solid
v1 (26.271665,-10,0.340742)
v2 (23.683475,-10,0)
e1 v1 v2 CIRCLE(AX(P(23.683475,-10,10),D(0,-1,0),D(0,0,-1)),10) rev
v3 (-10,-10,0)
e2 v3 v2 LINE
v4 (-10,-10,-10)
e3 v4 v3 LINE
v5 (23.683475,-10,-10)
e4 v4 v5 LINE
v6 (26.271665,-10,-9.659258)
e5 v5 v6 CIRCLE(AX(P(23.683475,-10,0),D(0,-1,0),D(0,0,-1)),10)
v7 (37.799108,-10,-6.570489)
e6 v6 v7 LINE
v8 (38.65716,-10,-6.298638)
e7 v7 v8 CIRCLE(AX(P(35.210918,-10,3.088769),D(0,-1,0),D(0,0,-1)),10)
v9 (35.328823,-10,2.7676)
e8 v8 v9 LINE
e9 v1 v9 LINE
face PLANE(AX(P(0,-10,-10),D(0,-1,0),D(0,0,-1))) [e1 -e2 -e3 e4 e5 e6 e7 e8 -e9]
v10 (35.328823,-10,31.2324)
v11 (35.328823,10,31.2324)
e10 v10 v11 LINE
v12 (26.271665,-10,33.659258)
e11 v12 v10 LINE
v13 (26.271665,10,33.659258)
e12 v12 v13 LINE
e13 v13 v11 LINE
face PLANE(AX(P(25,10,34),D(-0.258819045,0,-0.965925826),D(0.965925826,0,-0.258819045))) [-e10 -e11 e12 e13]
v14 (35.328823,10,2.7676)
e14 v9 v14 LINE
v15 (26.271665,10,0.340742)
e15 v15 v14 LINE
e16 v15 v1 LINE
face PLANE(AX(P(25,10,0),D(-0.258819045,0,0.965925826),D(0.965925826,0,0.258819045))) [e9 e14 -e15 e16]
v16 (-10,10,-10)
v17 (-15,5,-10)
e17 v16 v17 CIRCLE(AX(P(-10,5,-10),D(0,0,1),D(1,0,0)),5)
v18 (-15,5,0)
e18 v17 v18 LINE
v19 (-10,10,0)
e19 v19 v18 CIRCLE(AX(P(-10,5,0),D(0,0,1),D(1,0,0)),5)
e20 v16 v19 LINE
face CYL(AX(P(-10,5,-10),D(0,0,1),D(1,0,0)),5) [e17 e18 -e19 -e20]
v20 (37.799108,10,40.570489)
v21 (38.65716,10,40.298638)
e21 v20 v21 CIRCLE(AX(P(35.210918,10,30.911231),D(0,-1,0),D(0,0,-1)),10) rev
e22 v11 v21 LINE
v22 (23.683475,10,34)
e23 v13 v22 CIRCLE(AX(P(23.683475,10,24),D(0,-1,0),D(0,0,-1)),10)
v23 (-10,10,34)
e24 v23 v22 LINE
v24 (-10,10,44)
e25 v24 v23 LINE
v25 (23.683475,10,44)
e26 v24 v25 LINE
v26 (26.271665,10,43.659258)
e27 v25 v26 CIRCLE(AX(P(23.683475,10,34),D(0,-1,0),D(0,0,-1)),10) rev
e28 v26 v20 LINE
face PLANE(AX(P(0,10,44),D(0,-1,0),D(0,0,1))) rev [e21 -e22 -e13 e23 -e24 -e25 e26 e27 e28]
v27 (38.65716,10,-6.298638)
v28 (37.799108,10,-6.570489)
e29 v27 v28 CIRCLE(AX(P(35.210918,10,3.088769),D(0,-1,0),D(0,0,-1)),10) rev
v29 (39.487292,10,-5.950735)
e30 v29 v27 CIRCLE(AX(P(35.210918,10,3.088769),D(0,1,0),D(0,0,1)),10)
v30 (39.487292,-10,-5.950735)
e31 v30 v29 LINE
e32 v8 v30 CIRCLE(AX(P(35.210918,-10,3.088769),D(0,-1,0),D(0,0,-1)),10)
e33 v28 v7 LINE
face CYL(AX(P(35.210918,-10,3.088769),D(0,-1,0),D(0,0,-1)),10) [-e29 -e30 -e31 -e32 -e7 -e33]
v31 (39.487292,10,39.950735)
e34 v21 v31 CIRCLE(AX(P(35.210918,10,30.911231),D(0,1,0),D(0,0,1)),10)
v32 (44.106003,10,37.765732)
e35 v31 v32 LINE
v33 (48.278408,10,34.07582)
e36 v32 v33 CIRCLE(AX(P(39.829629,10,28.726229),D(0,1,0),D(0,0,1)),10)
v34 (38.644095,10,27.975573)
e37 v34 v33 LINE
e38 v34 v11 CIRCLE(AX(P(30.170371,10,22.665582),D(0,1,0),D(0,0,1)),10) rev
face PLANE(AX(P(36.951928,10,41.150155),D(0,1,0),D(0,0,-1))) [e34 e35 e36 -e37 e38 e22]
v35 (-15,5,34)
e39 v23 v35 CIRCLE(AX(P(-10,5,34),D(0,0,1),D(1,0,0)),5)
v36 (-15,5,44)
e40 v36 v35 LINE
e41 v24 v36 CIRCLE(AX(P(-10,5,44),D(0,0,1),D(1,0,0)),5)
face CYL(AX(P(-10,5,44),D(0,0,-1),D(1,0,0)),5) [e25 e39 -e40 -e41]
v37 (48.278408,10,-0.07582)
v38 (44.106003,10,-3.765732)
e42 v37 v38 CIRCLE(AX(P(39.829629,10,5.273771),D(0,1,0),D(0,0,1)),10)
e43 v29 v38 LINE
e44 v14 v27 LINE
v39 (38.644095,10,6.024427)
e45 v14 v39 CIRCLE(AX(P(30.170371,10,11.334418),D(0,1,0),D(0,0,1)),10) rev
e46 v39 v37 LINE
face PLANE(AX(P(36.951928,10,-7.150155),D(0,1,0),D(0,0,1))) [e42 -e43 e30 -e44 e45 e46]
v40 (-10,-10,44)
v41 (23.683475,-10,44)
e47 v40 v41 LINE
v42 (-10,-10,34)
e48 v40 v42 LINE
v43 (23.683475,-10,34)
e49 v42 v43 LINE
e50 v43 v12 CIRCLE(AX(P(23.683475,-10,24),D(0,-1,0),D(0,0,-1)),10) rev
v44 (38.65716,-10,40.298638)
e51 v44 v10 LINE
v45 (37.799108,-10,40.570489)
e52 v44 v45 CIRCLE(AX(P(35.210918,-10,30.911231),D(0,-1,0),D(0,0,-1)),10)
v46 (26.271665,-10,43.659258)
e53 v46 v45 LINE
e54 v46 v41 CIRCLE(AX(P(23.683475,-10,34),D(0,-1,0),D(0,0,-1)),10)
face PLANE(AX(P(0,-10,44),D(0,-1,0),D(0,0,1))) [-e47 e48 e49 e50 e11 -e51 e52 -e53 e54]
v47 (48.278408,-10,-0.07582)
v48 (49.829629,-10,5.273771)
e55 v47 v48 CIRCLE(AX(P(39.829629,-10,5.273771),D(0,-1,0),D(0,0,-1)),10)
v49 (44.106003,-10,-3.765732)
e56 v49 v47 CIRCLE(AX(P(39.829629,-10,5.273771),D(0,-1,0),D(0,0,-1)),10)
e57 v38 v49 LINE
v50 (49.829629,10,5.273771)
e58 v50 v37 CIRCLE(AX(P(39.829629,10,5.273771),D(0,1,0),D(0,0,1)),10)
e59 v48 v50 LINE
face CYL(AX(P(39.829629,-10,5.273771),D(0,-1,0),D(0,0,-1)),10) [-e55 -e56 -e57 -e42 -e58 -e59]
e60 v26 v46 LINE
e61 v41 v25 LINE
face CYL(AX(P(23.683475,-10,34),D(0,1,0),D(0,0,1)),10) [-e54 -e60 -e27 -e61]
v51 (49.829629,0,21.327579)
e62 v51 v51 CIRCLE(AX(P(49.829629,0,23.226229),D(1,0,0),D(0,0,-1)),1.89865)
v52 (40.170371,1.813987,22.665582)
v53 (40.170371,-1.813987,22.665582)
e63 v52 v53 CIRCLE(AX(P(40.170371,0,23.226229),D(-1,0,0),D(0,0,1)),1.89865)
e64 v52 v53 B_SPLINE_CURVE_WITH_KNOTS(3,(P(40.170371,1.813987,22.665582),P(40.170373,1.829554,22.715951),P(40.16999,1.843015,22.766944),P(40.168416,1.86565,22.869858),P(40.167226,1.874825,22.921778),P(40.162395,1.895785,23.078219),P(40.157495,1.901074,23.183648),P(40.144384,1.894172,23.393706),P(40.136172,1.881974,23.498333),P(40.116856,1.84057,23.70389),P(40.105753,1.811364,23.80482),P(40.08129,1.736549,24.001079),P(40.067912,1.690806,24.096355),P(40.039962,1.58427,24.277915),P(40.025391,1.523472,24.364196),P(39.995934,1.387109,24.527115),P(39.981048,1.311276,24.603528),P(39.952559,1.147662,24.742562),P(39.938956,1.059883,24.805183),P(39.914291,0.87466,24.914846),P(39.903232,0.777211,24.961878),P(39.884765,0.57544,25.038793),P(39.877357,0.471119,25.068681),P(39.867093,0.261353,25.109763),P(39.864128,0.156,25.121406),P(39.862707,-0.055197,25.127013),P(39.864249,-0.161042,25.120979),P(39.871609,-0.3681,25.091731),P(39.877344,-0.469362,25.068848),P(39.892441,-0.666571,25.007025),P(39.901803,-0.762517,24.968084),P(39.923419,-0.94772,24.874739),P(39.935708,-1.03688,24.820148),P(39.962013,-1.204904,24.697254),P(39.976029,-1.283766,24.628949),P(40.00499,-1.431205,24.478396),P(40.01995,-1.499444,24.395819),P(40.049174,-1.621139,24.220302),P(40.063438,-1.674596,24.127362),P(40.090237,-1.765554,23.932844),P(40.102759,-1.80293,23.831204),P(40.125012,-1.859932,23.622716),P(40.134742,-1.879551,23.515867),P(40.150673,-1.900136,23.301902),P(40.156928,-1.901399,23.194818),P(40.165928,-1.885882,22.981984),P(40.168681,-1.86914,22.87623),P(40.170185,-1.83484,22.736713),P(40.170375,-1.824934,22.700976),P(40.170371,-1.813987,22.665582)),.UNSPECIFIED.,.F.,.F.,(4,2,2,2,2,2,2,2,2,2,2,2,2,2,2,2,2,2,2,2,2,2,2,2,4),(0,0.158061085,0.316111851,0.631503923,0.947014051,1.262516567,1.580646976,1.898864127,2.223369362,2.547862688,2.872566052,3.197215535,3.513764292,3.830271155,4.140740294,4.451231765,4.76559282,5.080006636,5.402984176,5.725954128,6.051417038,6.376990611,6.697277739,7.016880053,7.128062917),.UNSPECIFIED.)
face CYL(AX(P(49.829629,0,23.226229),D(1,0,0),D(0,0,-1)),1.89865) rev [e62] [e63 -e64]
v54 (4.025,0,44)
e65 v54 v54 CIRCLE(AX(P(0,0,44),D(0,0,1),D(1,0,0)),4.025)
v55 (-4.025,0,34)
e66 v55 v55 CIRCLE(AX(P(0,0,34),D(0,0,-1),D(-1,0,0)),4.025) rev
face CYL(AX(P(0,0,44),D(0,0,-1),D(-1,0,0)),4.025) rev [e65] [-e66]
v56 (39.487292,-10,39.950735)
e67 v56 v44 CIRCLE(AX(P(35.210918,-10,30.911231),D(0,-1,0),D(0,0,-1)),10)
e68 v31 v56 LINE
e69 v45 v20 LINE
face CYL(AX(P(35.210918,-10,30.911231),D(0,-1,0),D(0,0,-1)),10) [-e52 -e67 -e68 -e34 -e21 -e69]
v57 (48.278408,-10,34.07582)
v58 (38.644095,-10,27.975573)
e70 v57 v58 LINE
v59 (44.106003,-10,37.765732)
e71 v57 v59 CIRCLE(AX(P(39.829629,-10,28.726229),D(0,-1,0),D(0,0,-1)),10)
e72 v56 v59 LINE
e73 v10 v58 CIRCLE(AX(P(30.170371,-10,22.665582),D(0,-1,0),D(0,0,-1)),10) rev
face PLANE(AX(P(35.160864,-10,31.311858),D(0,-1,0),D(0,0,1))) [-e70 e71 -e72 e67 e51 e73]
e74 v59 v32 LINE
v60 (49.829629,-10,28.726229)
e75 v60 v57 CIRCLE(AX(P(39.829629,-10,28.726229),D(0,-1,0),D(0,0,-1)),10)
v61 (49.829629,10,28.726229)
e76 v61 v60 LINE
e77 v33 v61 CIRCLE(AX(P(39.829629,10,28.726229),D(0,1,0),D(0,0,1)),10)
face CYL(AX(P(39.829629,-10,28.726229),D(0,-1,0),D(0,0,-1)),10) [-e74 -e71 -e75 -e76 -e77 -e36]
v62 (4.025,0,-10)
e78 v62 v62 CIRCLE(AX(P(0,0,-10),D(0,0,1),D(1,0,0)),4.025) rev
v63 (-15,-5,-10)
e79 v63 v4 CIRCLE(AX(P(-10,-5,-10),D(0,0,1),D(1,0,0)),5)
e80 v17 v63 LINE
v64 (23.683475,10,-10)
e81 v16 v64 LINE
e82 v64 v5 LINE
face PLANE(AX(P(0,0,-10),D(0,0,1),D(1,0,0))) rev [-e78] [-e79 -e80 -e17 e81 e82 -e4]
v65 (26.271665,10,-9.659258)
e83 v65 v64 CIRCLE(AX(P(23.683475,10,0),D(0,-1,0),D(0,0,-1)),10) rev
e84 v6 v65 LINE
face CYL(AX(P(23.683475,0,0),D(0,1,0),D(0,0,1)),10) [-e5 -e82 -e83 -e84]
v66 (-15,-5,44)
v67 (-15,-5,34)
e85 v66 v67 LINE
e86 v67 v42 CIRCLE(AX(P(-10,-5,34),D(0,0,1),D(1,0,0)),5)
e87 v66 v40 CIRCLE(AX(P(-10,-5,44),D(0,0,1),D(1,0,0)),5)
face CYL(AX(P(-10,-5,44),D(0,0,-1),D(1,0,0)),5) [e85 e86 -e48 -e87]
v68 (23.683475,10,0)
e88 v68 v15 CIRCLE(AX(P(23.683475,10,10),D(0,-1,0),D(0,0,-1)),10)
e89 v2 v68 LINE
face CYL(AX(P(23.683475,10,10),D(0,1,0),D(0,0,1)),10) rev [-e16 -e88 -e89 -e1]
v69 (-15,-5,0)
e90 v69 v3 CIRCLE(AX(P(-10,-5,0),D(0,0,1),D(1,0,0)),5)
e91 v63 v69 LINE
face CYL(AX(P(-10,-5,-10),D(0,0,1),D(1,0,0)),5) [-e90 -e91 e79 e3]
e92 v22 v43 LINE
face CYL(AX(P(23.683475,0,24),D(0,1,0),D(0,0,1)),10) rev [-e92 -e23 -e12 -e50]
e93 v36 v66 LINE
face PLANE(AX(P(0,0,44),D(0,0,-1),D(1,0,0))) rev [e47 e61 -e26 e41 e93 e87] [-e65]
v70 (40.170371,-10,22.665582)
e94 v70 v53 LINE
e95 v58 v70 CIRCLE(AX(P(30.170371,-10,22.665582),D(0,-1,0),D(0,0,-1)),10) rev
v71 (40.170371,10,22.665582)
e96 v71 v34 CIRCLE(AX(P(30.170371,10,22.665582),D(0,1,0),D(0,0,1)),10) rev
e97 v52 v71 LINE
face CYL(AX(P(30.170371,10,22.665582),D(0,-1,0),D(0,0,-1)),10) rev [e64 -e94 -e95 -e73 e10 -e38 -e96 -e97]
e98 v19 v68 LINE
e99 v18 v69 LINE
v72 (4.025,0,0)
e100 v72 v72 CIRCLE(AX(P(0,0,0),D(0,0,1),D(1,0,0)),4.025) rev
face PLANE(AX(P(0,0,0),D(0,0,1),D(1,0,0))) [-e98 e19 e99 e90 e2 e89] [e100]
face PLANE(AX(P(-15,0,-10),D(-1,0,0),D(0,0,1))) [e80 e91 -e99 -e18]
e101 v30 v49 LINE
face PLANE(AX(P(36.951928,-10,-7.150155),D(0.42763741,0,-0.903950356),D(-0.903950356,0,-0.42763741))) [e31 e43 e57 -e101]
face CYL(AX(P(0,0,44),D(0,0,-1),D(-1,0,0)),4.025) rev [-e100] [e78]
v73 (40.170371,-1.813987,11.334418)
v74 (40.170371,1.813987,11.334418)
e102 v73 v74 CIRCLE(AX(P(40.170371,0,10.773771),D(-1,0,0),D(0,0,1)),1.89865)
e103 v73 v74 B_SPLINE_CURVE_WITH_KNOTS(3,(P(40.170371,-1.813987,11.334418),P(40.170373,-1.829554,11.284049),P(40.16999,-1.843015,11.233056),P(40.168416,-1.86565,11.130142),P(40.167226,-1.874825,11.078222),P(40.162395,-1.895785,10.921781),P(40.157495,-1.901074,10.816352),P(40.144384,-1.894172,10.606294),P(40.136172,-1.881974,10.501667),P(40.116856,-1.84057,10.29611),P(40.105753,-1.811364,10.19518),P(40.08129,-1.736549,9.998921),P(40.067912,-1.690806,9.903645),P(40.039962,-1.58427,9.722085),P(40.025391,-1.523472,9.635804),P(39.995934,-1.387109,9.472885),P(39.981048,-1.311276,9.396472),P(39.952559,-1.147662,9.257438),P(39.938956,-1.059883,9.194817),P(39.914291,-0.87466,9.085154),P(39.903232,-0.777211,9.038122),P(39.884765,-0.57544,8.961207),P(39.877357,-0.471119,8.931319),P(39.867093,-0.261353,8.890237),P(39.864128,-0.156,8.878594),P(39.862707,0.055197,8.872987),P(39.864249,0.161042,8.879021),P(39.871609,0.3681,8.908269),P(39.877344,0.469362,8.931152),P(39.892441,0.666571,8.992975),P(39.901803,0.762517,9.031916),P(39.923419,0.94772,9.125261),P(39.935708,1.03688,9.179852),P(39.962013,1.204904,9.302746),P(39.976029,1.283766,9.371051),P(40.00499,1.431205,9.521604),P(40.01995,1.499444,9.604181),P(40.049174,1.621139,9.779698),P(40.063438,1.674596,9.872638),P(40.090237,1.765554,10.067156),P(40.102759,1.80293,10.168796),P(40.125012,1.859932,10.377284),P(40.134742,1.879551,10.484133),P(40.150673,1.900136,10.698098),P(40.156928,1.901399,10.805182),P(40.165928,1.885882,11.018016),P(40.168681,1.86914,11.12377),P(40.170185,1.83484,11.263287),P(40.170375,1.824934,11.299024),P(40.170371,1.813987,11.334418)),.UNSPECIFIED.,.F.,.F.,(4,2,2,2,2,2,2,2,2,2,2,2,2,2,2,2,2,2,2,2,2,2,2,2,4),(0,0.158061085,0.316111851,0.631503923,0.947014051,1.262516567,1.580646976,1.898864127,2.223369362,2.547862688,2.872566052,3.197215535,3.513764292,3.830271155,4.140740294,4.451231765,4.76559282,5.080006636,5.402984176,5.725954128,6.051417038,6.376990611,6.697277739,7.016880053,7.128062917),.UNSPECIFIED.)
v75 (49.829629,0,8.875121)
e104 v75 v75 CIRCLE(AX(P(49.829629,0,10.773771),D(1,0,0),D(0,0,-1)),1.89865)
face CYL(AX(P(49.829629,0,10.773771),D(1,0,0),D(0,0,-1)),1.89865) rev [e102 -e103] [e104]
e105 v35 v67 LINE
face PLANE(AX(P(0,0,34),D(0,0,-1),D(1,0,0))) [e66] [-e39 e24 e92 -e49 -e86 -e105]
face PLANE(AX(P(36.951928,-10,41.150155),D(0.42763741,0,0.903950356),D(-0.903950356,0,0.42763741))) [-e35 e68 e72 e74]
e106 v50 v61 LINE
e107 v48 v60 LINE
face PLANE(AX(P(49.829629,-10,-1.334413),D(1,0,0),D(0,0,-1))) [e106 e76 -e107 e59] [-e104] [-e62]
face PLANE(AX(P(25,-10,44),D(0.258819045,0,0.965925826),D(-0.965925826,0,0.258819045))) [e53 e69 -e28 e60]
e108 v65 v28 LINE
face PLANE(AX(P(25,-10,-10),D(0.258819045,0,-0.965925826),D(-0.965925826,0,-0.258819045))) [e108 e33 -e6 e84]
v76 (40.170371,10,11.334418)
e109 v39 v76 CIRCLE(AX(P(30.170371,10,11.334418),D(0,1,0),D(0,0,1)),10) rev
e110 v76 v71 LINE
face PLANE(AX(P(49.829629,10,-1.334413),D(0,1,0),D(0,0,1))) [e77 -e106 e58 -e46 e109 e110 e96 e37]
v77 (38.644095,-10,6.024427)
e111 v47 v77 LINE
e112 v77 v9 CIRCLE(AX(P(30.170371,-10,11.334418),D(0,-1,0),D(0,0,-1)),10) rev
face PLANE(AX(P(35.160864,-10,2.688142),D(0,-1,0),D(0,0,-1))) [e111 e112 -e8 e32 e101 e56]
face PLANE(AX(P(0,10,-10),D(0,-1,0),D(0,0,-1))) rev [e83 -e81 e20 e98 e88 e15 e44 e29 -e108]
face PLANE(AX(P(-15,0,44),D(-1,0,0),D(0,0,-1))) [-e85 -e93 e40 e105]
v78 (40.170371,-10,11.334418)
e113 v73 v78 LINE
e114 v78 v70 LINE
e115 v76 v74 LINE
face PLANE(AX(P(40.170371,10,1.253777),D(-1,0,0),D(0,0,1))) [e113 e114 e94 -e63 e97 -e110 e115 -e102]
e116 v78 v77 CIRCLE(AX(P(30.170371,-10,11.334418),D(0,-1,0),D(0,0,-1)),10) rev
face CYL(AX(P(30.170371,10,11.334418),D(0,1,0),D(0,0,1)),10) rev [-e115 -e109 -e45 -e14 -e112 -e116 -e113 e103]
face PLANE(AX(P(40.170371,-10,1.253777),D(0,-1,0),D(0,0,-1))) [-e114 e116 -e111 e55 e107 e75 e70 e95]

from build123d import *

# Parameters (mm, degrees)
SKETCH4_R                      = 4.025
BOSS_EXTRUDE1_DEPTH            = 10
SWEEP2_START                   = -10
SWEEP2_DEPTH                   = 20
CUT_EXTRUDE2_REACH             = 58.724
BOSS_EXTRUDE2_DEPTH            = 20
CUT_EXTRUDE3_REACH             = 69.223
SKETCH4_10_R                   = 4.025
CUT_EXTRUDE3_DIRECTION_2_DEPTH = 68.223447839
FILLET4_R                      = 10
F_6_CLEARANCE_HOLE1_D          = 3.7973


with BuildPart() as part:
    # Sketch4 → Boss-Extrude1 (new body)
    # profile 1 of 2: a face of its own
    with BuildSketch(Plane.XY):
        with BuildLine():
            Line((-10, 10), (25, 10))
            Line((25, 10), (25, -10))
            Line((25, -10), (-10, -10))
            ThreePointArc((-10, -10), (-13.535533906, -8.535533906), (-15, -5))
            Line((-15, -5), (-15, 5))
            ThreePointArc((-15, 5), (-13.535533906, 8.535533906), (-10, 10))
        make_face()
        Circle(SKETCH4_R, mode=Mode.SUBTRACT)
    # profile 2 of 2: a face of its own
    with BuildSketch(Plane.XY):
        Circle(SKETCH4_R)
    extrude(amount=-BOSS_EXTRUDE1_DEPTH)

    # Sweep2: read off the stored shape, not the designer's step
    # Sweep2 outline → Sweep2 (add)
    with BuildSketch(Plane(origin=(0, 0, 0), x_dir=(1, 0, 0), z_dir=(0, 1, 0)).offset(SWEEP2_START)):
        Polygon((40.170370869, -5.058020855), (40.170370869, -18.294095226), (49.829629131, -15.705904774), (49.829629131, 1.058020855), (38.67117676, 6.336819228), (25, 10), (25, 0), (35.32882324, -2.767599846), align=None)
    extrude(amount=SWEEP2_DEPTH)

    # Sketch18 → Cut-Extrude2 (cut, up to next)
    with BuildSketch(Plane(origin=(0, 10, 0), x_dir=(1, 0, 0), z_dir=(0, 1, 0)), mode=Mode.PRIVATE) as cut_extrude2_sk1:
        Polygon((40.170370869, -18.294095226), (45, -17), (40.170370869, -17), align=None)
    cut_extrude2_tool1 = extrude(cut_extrude2_sk1.sketch, amount=-CUT_EXTRUDE2_REACH, mode=Mode.PRIVATE) & part.part
    add(cut_extrude2_tool1.solids().sort_by_distance((41.780247, 10, 17.431365))[0], mode=Mode.SUBTRACT)

    # Sketch18<3> → Boss-Extrude2 (add, through all)
    with BuildSketch(Plane(origin=(0, 10, 0), x_dir=(1, 0, 0), z_dir=(0, 1, 0))):
        Polygon((49.829629131, -17), (49.829629131, -15.705904774), (45, -17), align=None)
    extrude(amount=-BOSS_EXTRUDE2_DEPTH)

    # Mirror1: part across face


with BuildPart() as part_1:
    add(part.part)
    add(part.part.mirror(Plane(origin=(45, 0, 17), x_dir=(1, 0, 0), z_dir=(0, 0, 1))))

    # Sketch4<10> → Cut-Extrude3 (cut, up to next)
    with BuildSketch(Plane.XY, mode=Mode.PRIVATE) as cut_extrude3_sk1:
        with Locations(Location((0, 0, 0), (0, 0, 180))):
            Circle(SKETCH4_10_R)
    cut_extrude3_tool1 = extrude(cut_extrude3_sk1.sketch, amount=-CUT_EXTRUDE3_REACH, mode=Mode.PRIVATE) & part_1.part
    add(cut_extrude3_tool1.solids().sort_by_distance((0, 0, 0))[0], mode=Mode.SUBTRACT)

    # Sketch4<10> → Cut-Extrude3 direction 2 (cut)
    with BuildSketch(Plane.XY):
        with Locations(Location((0, 0, 0), (0, 0, 180))):
            Circle(SKETCH4_10_R)
    extrude(amount=CUT_EXTRUDE3_DIRECTION_2_DEPTH, mode=Mode.SUBTRACT)

    # Fillet4
    # the kernel refuses this fillet: 10 mm, written as the material it adds along each edge
    with BuildSketch(Plane(origin=(25, 10, 34), x_dir=(-1, 0, 0), z_dir=(0, -1, 0))) as fillet4_piece_1:
        with BuildLine():
            CenterArc((FILLET4_R * 0.131652497591, FILLET4_R), FILLET4_R, 255, 15)
            Line((-FILLET4_R * 0.127166547518, FILLET4_R * 0.0340741737128), (0, 0))
            Line((0, 0), (FILLET4_R * 0.131652497591, 0))
        make_face()
    extrude(amount=20)
    with BuildSketch(Plane(origin=(25, 10, 0), x_dir=(-1, 0, 0), z_dir=(0, -1, 0))) as fillet4_piece_2:
        with BuildLine():
            CenterArc((FILLET4_R * 0.131652497591, -FILLET4_R), FILLET4_R, 90, 15)
            Line((-FILLET4_R * 0.127166547518, -FILLET4_R * 0.0340741737128), (0, 0))
            Line((0, 0), (FILLET4_R * 0.131652497591, 0))
        make_face()
    extrude(amount=20)
    with BuildSketch(Plane(origin=(40.170370869, -10, 5.058020855), x_dir=(0, 0, 1), z_dir=(0, 1, 0))) as fillet4_piece_3:
        with BuildLine():
            CenterArc((6.276396903, -10), FILLET4_R, 90, 58.94603144)
            Line((-2.290421009, -4.841547629), (0, 0))
            Line((0, 0), (6.276396903, 0))
        make_face()
    extrude(amount=20)
    with BuildSketch(Plane(origin=(40.170370869, -10, 28.941979145), x_dir=(-0.90395035591234, 0, 0.4276374095492042), z_dir=(0, 1, 0))) as fillet4_piece_4:
        with BuildLine():
            CenterArc((6.355481446, -9.94992531), FILLET4_R, 95.736251166, 58.94603144)
            Line((-2.684022113, -5.673551214), (0, 0))
            Line((0, 0), (5.355988409, 0))
        make_face()
    extrude(amount=20)
    # the kernel refuses this fillet: 10 mm, written as the material it takes off along each edge
    with BuildSketch(Plane(origin=(49.829629131, -25.829480752, -1.058020855), x_dir=(-0.9039503558586357, 0, -0.4276374096627259), z_dir=(0, 1, 0)), Plane(origin=(49.829629131, -25.829480752, 35.058020855), x_dir=(0, 0, -1), z_dir=(0, 1, 0))) as fillet4_2_piece_1:
        with BuildLine():
            CenterArc((FILLET4_R * 0.633179230062, FILLET4_R), FILLET4_R, 205.317717401, 64.682282599)
            Line((-FILLET4_R * 0.270771125796, FILLET4_R * 0.572362590337), (0, 0))
            Line((0, 0), (FILLET4_R * 0.633179230062, 0))
        make_face()
    extrude(amount=51.658961503, mode=Mode.SUBTRACT)
    with BuildSketch(Plane(origin=(38.67117676, -12.257079455, -6.336819228), x_dir=(0.9039503558586354, 0, 0.42763740966272634), z_dir=(0, 1, 0))) as fillet4_2_piece_2:
        with BuildLine():
            CenterArc((FILLET4_R * 0.0902831782122, -FILLET4_R), FILLET4_R, 90, 10.317717402)
            Line((-FILLET4_R * 0.0888232721735, -FILLET4_R * 0.0161702995791), (0, 0))
            Line((0, 0), (FILLET4_R * 0.0902831782122, 0))
        make_face()
    extrude(amount=24.514158911, mode=Mode.SUBTRACT)
    with BuildSketch(Plane(origin=(25, 13.291312439, -10), x_dir=(-1, 0, 0), z_dir=(0, -1, 0)), Plane(origin=(25, 13.291312439, 44), x_dir=(0.9659258262965777, 0, -0.2588190450744948), z_dir=(0, -1, 0))) as fillet4_2_piece_3:
        with BuildLine():
            CenterArc((FILLET4_R * 0.131652497573, -FILLET4_R), FILLET4_R, 90, 14.999999998)
            Line((-FILLET4_R * 0.127166547502, -FILLET4_R * 0.0340741737034), (0, 0))
            Line((0, 0), (FILLET4_R * 0.131652497573, 0))
        make_face()
    extrude(amount=26.582624879, mode=Mode.SUBTRACT)
    with BuildSketch(Plane(origin=(38.67117676, -12.257079455, 40.336819228), x_dir=(0.9039503558586373, 0, -0.42763740966272235), z_dir=(0, 1, 0))) as fillet4_2_piece_4:
        with BuildLine():
            CenterArc((FILLET4_R * 0.0902831782122, FILLET4_R), FILLET4_R, 259.682282598, 10.317717402)
            Line((-FILLET4_R * 0.0888232721735, FILLET4_R * 0.0161702995791), (0, 0))
            Line((0, 0), (FILLET4_R * 0.0902831782122, 0))
        make_face()
    extrude(amount=24.514158911, mode=Mode.SUBTRACT)

    # #6 Clearance Hole1 (through all)
    with Locations(Plane(origin=(49.829629131, 0, 0), x_dir=(0, 0, -1), z_dir=(1, 0, 0))):
        with Locations((-10.773771446, 0), (-23.226228554, 0)):
            Hole(F_6_CLEARANCE_HOLE1_D / 2)


solid = part_1.part
